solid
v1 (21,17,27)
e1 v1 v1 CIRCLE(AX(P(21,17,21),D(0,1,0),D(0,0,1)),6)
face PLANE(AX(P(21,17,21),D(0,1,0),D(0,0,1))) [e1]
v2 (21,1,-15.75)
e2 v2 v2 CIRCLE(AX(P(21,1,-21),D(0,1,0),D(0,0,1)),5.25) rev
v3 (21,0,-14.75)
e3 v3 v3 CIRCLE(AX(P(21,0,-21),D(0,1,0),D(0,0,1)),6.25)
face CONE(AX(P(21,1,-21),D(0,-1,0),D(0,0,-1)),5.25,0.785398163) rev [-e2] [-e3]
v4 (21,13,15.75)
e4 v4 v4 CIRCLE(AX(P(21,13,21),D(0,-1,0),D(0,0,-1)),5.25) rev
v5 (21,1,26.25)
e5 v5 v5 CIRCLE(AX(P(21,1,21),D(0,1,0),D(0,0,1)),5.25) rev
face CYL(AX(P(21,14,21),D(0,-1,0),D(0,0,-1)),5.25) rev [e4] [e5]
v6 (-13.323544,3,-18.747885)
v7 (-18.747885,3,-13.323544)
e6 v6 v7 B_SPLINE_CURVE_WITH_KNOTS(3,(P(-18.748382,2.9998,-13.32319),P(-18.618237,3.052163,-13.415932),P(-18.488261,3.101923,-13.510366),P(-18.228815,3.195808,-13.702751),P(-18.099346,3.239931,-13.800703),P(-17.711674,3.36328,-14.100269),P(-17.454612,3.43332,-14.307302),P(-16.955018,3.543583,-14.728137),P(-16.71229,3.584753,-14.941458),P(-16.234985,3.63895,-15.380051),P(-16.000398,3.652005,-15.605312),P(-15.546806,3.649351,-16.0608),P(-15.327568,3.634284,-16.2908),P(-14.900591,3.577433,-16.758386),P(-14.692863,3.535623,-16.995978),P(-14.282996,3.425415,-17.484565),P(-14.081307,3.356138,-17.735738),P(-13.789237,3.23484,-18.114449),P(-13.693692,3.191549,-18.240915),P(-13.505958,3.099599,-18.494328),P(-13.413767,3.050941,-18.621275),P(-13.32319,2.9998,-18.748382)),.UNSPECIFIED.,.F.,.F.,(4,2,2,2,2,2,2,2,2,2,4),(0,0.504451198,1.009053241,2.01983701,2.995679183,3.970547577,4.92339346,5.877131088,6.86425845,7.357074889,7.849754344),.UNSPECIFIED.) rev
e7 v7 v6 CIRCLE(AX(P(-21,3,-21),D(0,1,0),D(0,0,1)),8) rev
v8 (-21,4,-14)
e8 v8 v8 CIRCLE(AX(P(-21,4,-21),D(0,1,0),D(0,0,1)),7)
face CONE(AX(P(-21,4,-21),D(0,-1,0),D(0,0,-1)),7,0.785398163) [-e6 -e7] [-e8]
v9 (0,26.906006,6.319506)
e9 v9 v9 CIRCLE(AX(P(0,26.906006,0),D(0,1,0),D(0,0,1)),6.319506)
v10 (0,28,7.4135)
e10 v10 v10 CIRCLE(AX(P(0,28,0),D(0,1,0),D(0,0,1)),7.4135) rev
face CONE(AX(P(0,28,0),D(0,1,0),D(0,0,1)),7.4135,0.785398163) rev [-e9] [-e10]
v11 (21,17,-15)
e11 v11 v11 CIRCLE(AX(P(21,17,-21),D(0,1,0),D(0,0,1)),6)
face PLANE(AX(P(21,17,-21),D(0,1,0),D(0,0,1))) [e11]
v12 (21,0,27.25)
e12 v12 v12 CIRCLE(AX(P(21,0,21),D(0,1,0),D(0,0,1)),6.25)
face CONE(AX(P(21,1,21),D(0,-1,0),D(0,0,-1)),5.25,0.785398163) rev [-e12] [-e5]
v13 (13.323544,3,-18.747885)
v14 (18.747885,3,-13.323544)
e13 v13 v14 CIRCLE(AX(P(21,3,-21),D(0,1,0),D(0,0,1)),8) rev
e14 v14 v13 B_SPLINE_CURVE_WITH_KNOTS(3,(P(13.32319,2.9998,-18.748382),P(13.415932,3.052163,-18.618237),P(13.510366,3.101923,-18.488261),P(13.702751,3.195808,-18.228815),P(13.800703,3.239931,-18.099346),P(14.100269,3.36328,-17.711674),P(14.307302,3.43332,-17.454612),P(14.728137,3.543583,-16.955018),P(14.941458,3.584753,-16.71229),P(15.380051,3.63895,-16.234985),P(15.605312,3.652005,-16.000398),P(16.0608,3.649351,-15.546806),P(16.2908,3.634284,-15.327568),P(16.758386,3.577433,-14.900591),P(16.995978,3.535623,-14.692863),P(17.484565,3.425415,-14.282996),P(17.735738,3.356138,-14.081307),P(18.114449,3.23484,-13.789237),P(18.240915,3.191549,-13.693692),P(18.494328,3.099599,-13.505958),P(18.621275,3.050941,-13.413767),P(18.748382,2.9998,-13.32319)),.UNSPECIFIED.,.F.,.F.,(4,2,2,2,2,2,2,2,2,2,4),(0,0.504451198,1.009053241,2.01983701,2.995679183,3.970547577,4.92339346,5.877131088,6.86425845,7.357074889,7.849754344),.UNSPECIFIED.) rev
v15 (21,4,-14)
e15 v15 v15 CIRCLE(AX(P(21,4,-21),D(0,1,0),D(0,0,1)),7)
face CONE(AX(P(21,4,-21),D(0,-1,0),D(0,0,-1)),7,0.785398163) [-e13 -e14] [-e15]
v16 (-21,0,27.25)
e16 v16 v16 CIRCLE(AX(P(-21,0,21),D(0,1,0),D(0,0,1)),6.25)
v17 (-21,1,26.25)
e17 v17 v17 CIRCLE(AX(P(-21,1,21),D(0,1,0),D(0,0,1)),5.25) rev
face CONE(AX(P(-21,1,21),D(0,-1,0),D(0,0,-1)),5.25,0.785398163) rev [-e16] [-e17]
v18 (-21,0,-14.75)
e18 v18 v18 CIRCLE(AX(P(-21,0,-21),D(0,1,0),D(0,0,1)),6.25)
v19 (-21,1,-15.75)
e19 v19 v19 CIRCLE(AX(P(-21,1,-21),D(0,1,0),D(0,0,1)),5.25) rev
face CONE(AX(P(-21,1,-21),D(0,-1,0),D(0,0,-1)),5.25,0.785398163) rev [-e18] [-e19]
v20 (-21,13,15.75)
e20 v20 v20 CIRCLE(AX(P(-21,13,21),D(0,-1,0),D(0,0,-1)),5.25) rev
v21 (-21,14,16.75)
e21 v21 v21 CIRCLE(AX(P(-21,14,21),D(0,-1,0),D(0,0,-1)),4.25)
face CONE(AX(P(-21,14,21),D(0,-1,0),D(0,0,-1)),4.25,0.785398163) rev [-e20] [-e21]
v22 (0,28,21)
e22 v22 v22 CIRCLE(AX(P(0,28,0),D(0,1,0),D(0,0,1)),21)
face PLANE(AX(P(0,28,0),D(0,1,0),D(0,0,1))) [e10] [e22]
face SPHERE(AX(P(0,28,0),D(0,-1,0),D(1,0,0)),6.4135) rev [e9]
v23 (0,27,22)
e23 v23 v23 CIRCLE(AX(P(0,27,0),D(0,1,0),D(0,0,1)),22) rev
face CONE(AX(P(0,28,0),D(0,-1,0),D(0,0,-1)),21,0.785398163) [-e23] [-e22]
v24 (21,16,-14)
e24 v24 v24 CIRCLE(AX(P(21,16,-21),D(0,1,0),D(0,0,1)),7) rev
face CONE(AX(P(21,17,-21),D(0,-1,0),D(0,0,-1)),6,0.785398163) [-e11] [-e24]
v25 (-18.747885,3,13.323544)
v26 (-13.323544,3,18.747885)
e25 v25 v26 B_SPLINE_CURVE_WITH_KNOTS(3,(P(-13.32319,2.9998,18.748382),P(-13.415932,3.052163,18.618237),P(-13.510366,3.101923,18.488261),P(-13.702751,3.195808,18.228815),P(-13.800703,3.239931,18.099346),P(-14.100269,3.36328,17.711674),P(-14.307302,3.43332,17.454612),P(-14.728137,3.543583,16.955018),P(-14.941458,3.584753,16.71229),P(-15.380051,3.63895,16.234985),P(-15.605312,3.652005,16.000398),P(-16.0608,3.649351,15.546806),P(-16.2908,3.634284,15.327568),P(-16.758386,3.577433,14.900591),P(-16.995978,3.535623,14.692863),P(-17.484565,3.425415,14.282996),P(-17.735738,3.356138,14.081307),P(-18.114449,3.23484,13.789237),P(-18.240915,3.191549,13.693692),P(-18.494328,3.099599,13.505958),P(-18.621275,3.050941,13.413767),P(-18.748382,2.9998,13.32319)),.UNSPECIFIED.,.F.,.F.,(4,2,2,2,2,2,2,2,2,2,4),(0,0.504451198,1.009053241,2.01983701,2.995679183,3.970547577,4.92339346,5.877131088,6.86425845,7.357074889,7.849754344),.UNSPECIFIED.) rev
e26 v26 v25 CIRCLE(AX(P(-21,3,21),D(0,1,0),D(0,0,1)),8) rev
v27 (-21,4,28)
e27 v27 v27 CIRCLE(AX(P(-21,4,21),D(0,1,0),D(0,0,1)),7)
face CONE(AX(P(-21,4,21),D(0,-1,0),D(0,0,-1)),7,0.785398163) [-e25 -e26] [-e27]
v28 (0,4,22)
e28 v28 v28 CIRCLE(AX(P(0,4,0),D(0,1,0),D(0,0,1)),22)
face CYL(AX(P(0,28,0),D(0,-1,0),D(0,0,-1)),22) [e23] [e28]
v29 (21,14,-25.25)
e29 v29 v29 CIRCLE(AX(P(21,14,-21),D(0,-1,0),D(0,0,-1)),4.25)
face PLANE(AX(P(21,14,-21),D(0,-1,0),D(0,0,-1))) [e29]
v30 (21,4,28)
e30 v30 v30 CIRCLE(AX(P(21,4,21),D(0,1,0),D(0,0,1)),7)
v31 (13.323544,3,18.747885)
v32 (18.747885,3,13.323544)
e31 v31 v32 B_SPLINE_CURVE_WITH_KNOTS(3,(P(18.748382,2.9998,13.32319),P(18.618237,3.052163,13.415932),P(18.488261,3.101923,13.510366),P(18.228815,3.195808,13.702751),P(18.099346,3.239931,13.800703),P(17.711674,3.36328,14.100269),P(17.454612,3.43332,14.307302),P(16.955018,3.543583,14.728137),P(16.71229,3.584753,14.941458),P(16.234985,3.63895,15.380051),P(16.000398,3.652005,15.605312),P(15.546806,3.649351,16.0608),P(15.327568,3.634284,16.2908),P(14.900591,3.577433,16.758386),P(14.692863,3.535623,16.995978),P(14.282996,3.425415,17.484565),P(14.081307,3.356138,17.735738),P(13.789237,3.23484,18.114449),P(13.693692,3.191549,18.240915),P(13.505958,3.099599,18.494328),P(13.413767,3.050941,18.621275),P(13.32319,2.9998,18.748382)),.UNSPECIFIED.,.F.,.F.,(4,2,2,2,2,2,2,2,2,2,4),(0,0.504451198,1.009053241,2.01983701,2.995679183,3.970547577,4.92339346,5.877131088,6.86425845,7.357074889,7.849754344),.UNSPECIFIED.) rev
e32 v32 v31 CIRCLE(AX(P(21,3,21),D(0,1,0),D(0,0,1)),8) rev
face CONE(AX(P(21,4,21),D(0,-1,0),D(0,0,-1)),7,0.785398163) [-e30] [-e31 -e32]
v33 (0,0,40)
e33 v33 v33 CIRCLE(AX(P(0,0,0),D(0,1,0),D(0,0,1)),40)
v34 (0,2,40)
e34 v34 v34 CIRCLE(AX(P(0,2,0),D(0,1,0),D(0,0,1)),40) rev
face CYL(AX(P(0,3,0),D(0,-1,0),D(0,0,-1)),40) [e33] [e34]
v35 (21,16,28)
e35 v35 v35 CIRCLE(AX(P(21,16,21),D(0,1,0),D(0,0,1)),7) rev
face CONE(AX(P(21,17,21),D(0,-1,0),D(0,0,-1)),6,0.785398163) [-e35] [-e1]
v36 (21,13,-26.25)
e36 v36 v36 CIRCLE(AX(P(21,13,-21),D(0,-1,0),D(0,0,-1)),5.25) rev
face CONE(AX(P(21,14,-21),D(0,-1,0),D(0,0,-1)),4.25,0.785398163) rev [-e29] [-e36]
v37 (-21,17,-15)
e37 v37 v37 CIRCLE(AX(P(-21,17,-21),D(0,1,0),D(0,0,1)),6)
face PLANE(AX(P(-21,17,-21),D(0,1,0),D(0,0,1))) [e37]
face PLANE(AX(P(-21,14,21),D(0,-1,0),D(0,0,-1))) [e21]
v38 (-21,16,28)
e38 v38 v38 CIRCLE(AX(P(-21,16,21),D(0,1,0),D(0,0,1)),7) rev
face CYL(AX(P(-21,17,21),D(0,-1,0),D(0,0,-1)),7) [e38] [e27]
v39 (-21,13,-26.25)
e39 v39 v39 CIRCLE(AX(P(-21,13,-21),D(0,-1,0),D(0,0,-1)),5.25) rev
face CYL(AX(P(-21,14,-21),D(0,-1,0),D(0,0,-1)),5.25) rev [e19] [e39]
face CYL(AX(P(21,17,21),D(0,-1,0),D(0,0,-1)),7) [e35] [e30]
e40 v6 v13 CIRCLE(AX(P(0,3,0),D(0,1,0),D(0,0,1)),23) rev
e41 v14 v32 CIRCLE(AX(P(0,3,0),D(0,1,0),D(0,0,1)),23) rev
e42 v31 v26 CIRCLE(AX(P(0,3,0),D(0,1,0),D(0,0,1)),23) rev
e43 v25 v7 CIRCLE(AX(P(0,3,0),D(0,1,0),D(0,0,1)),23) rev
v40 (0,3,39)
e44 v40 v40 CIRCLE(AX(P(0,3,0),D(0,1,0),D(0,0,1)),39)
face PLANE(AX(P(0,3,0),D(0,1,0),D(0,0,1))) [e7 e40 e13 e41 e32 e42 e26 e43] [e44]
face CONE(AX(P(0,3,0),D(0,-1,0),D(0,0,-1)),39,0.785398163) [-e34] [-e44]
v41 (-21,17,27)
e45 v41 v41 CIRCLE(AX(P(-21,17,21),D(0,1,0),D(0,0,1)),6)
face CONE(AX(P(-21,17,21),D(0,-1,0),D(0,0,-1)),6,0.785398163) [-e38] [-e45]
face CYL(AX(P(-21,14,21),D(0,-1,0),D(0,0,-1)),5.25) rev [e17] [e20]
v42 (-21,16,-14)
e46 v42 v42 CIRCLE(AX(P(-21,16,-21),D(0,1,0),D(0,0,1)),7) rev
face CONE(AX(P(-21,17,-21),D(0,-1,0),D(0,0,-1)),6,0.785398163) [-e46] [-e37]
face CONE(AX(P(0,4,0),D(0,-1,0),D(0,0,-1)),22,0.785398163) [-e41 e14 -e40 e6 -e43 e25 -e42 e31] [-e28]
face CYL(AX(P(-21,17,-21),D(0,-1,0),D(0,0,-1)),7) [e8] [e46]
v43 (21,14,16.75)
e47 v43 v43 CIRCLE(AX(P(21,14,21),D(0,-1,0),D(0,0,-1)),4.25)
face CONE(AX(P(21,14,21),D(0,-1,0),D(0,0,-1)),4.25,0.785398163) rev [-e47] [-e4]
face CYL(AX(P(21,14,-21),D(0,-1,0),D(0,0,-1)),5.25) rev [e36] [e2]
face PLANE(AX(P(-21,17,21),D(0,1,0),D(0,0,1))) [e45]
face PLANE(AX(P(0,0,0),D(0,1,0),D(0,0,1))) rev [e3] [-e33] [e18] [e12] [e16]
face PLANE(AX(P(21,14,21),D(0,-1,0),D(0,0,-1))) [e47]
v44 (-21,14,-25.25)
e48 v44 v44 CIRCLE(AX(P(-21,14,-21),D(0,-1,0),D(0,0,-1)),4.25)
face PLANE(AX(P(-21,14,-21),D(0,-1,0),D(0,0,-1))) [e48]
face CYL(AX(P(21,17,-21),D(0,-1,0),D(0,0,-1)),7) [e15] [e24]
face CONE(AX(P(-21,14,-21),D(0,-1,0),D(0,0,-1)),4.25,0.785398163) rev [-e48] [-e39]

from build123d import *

# Parameters (mm, degrees)
SKETCH1_R                 = 40
HOLDER_BASE_DEPTH         = 3
SKETCH2_R                 = 22
BALL_HOLDER_EXTRUDE_DEPTH = 25
SKETCH3_R                 = 7
PEG_EXTRUDES_DEPTH        = 14
SKETCH4_R                 = 5.25
PEG_HOLES_DEPTH           = 14
CHAMFER1_SIZE             = 1
CHAMFER2_SIZE             = 1


with BuildPart() as part:
    # Sketch1 → Holder Base (new body)
    with BuildSketch(Plane(origin=(0, 0, 0), x_dir=(1, 0, 0), z_dir=(0, 1, 0))):
        with Locations(Location((0, 0, 0), (0, 0, 270))):
            Circle(SKETCH1_R)
    extrude(amount=HOLDER_BASE_DEPTH)

    # Sketch2 → Ball Holder Extrude (add)
    with BuildSketch(Plane(origin=(0, 3, 0), x_dir=(1, 0, 0), z_dir=(0, 1, 0))):
        with Locations(Location((0, 0, 0), (0, 0, 270))):
            Circle(SKETCH2_R)
    extrude(amount=BALL_HOLDER_EXTRUDE_DEPTH)

    # Sketch5 → Ball Cut (revolve, cut)
    with BuildSketch(Plane.XY):
        with BuildLine():
            Line((0, 21.5865), (0, 34.4135))
            ThreePointArc((0, 34.4135), (-6.4135, 28), (0, 21.5865))
        make_face()
    revolve(axis=Axis((0, -1000, 0), (0, 1, 0)), mode=Mode.SUBTRACT)

    # Sketch3 → Peg Extrudes (add)
    with BuildSketch(Plane(origin=(0, 3, 0), x_dir=(1, 0, 0), z_dir=(0, 1, 0))):
        with Locations(Location((-21, 21, 0), (0, 0, 270))):
            Circle(SKETCH3_R)
        with Locations(Location((21, 21, 0), (0, 0, 270))):
            Circle(SKETCH3_R)
        with Locations(Location((21, -21, 0), (0, 0, 270))):
            Circle(SKETCH3_R)
        with Locations(Location((-21, -21, 0), (0, 0, 270))):
            Circle(SKETCH3_R)
    extrude(amount=PEG_EXTRUDES_DEPTH)

    # Sketch4 → Peg Holes (cut)
    with BuildSketch(Plane.XZ):
        with Locations(Location((-21, -21, 0), (0, 0, 270))):
            Circle(SKETCH4_R)
        with Locations(Location((-21, 21, 0), (0, 0, 270))):
            Circle(SKETCH4_R)
        with Locations(Location((21, 21, 0), (0, 0, 270))):
            Circle(SKETCH4_R)
        with Locations(Location((21, -21, 0), (0, 0, 270))):
            Circle(SKETCH4_R)
    extrude(amount=-PEG_HOLES_DEPTH, mode=Mode.SUBTRACT)

    # Chamfer1
    # the kernel refuses this chamfer: 1 mm, written as the material it adds along each edge
    with BuildSketch(Plane(origin=(-21, 3, -21), x_dir=(0, 0, 1), z_dir=(-1, 0, 0))) as chamfer1_piece_1:
        Polygon((7 + CHAMFER1_SIZE, 0), (7, CHAMFER1_SIZE), (7, 0), align=None)
    revolve(axis=Axis((-21, 3, -21), (0, 1, 0)))
    with BuildSketch(Plane(origin=(21, 3, -21), x_dir=(0, 0, 1), z_dir=(-1, 0, 0))) as chamfer1_piece_2:
        Polygon((7 + CHAMFER1_SIZE, 0), (7, CHAMFER1_SIZE), (7, 0), align=None)
    revolve(axis=Axis((21, 3, -21), (0, 1, 0)))
    with BuildSketch(Plane(origin=(21, 3, 21), x_dir=(0, 0, 1), z_dir=(-1, 0, 0))) as chamfer1_piece_3:
        Polygon((7 + CHAMFER1_SIZE, 0), (7, CHAMFER1_SIZE), (7, 0), align=None)
    revolve(axis=Axis((21, 3, 21), (0, 1, 0)))
    with BuildSketch(Plane(origin=(-21, 3, 21), x_dir=(0, 0, 1), z_dir=(-1, 0, 0))) as chamfer1_piece_4:
        Polygon((7 + CHAMFER1_SIZE, 0), (7, CHAMFER1_SIZE), (7, 0), align=None)
    revolve(axis=Axis((-21, 3, 21), (0, 1, 0)))
    with BuildSketch(Plane(origin=(0, 3, 0), x_dir=(0, 0, 1), z_dir=(-1, 0, 0))) as chamfer1_piece_5:
        Polygon((22 + CHAMFER1_SIZE, 0), (22, CHAMFER1_SIZE), (22, 0), align=None)
    revolve(axis=Axis((0, 3, 0), (0, 1, 0)))
    # the kernel refuses this chamfer: 1 mm, written as the material it takes off along each edge
    with BuildSketch(Plane(origin=(0, 28, 0), x_dir=(-1, 0, 0), z_dir=(0, 0, 1))) as chamfer1_2_piece_1:
        with BuildLine():
            Line((6.4135 + CHAMFER1_SIZE, 0), (6.319506315, 1.093993685))
            ThreePointArc((6.319506315, 1.093993685), (6.388622712, 0.564342173), (6.4135, 0))
            Line((6.4135, 0), (6.4135 + CHAMFER1_SIZE, 0))
        make_face()
    revolve(axis=Axis((0, 28, 0), (0, -1, 0)), mode=Mode.SUBTRACT)
    with BuildSketch(Plane(origin=(-21, 17, -21), x_dir=(0, 0, 1), z_dir=(-1, 0, 0))) as chamfer1_2_piece_2:
        Polygon((7, -CHAMFER1_SIZE), (7 - CHAMFER1_SIZE, 0), (7, 0), align=None)
    revolve(axis=Axis((-21, 17, -21), (0, 1, 0)), mode=Mode.SUBTRACT)
    with BuildSketch(Plane(origin=(21, 17, -21), x_dir=(0, 0, 1), z_dir=(-1, 0, 0))) as chamfer1_2_piece_3:
        Polygon((7, -CHAMFER1_SIZE), (7 - CHAMFER1_SIZE, 0), (7, 0), align=None)
    revolve(axis=Axis((21, 17, -21), (0, 1, 0)), mode=Mode.SUBTRACT)
    with BuildSketch(Plane(origin=(21, 17, 21), x_dir=(0, 0, 1), z_dir=(-1, 0, 0))) as chamfer1_2_piece_4:
        Polygon((7, -CHAMFER1_SIZE), (7 - CHAMFER1_SIZE, 0), (7, 0), align=None)
    revolve(axis=Axis((21, 17, 21), (0, 1, 0)), mode=Mode.SUBTRACT)
    with BuildSketch(Plane(origin=(-21, 17, 21), x_dir=(0, 0, 1), z_dir=(-1, 0, 0))) as chamfer1_2_piece_5:
        Polygon((7, -CHAMFER1_SIZE), (7 - CHAMFER1_SIZE, 0), (7, 0), align=None)
    revolve(axis=Axis((-21, 17, 21), (0, 1, 0)), mode=Mode.SUBTRACT)
    with BuildSketch(Plane(origin=(0, 3, 0), x_dir=(0, 0, 1), z_dir=(-1, 0, 0))) as chamfer1_2_piece_6:
        Polygon((40, -CHAMFER1_SIZE), (40 - CHAMFER1_SIZE, 0), (40, 0), align=None)
    revolve(axis=Axis((0, 3, 0), (0, 1, 0)), mode=Mode.SUBTRACT)
    with BuildSketch(Plane(origin=(0, 28, 0), x_dir=(0, 0, 1), z_dir=(-1, 0, 0))) as chamfer1_2_piece_7:
        Polygon((22, -CHAMFER1_SIZE), (22 - CHAMFER1_SIZE, 0), (22, 0), align=None)
    revolve(axis=Axis((0, 28, 0), (0, 1, 0)), mode=Mode.SUBTRACT)

    # Chamfer2
    chamfer2_edges = [part.edges().sort_by_distance(p)[0] for p in [
        (21, 14, -15.75),
        (21, 0, -15.75),
        (21, 14, 26.25),
        (21, 0, 26.25),
        (-21, 14, 26.25),
        (-21, 0, 26.25),
        (-21, 14, -15.75),
        (-21, 0, -15.75),
    ]]
    chamfer(chamfer2_edges, length=CHAMFER2_SIZE)


solid = part.part
